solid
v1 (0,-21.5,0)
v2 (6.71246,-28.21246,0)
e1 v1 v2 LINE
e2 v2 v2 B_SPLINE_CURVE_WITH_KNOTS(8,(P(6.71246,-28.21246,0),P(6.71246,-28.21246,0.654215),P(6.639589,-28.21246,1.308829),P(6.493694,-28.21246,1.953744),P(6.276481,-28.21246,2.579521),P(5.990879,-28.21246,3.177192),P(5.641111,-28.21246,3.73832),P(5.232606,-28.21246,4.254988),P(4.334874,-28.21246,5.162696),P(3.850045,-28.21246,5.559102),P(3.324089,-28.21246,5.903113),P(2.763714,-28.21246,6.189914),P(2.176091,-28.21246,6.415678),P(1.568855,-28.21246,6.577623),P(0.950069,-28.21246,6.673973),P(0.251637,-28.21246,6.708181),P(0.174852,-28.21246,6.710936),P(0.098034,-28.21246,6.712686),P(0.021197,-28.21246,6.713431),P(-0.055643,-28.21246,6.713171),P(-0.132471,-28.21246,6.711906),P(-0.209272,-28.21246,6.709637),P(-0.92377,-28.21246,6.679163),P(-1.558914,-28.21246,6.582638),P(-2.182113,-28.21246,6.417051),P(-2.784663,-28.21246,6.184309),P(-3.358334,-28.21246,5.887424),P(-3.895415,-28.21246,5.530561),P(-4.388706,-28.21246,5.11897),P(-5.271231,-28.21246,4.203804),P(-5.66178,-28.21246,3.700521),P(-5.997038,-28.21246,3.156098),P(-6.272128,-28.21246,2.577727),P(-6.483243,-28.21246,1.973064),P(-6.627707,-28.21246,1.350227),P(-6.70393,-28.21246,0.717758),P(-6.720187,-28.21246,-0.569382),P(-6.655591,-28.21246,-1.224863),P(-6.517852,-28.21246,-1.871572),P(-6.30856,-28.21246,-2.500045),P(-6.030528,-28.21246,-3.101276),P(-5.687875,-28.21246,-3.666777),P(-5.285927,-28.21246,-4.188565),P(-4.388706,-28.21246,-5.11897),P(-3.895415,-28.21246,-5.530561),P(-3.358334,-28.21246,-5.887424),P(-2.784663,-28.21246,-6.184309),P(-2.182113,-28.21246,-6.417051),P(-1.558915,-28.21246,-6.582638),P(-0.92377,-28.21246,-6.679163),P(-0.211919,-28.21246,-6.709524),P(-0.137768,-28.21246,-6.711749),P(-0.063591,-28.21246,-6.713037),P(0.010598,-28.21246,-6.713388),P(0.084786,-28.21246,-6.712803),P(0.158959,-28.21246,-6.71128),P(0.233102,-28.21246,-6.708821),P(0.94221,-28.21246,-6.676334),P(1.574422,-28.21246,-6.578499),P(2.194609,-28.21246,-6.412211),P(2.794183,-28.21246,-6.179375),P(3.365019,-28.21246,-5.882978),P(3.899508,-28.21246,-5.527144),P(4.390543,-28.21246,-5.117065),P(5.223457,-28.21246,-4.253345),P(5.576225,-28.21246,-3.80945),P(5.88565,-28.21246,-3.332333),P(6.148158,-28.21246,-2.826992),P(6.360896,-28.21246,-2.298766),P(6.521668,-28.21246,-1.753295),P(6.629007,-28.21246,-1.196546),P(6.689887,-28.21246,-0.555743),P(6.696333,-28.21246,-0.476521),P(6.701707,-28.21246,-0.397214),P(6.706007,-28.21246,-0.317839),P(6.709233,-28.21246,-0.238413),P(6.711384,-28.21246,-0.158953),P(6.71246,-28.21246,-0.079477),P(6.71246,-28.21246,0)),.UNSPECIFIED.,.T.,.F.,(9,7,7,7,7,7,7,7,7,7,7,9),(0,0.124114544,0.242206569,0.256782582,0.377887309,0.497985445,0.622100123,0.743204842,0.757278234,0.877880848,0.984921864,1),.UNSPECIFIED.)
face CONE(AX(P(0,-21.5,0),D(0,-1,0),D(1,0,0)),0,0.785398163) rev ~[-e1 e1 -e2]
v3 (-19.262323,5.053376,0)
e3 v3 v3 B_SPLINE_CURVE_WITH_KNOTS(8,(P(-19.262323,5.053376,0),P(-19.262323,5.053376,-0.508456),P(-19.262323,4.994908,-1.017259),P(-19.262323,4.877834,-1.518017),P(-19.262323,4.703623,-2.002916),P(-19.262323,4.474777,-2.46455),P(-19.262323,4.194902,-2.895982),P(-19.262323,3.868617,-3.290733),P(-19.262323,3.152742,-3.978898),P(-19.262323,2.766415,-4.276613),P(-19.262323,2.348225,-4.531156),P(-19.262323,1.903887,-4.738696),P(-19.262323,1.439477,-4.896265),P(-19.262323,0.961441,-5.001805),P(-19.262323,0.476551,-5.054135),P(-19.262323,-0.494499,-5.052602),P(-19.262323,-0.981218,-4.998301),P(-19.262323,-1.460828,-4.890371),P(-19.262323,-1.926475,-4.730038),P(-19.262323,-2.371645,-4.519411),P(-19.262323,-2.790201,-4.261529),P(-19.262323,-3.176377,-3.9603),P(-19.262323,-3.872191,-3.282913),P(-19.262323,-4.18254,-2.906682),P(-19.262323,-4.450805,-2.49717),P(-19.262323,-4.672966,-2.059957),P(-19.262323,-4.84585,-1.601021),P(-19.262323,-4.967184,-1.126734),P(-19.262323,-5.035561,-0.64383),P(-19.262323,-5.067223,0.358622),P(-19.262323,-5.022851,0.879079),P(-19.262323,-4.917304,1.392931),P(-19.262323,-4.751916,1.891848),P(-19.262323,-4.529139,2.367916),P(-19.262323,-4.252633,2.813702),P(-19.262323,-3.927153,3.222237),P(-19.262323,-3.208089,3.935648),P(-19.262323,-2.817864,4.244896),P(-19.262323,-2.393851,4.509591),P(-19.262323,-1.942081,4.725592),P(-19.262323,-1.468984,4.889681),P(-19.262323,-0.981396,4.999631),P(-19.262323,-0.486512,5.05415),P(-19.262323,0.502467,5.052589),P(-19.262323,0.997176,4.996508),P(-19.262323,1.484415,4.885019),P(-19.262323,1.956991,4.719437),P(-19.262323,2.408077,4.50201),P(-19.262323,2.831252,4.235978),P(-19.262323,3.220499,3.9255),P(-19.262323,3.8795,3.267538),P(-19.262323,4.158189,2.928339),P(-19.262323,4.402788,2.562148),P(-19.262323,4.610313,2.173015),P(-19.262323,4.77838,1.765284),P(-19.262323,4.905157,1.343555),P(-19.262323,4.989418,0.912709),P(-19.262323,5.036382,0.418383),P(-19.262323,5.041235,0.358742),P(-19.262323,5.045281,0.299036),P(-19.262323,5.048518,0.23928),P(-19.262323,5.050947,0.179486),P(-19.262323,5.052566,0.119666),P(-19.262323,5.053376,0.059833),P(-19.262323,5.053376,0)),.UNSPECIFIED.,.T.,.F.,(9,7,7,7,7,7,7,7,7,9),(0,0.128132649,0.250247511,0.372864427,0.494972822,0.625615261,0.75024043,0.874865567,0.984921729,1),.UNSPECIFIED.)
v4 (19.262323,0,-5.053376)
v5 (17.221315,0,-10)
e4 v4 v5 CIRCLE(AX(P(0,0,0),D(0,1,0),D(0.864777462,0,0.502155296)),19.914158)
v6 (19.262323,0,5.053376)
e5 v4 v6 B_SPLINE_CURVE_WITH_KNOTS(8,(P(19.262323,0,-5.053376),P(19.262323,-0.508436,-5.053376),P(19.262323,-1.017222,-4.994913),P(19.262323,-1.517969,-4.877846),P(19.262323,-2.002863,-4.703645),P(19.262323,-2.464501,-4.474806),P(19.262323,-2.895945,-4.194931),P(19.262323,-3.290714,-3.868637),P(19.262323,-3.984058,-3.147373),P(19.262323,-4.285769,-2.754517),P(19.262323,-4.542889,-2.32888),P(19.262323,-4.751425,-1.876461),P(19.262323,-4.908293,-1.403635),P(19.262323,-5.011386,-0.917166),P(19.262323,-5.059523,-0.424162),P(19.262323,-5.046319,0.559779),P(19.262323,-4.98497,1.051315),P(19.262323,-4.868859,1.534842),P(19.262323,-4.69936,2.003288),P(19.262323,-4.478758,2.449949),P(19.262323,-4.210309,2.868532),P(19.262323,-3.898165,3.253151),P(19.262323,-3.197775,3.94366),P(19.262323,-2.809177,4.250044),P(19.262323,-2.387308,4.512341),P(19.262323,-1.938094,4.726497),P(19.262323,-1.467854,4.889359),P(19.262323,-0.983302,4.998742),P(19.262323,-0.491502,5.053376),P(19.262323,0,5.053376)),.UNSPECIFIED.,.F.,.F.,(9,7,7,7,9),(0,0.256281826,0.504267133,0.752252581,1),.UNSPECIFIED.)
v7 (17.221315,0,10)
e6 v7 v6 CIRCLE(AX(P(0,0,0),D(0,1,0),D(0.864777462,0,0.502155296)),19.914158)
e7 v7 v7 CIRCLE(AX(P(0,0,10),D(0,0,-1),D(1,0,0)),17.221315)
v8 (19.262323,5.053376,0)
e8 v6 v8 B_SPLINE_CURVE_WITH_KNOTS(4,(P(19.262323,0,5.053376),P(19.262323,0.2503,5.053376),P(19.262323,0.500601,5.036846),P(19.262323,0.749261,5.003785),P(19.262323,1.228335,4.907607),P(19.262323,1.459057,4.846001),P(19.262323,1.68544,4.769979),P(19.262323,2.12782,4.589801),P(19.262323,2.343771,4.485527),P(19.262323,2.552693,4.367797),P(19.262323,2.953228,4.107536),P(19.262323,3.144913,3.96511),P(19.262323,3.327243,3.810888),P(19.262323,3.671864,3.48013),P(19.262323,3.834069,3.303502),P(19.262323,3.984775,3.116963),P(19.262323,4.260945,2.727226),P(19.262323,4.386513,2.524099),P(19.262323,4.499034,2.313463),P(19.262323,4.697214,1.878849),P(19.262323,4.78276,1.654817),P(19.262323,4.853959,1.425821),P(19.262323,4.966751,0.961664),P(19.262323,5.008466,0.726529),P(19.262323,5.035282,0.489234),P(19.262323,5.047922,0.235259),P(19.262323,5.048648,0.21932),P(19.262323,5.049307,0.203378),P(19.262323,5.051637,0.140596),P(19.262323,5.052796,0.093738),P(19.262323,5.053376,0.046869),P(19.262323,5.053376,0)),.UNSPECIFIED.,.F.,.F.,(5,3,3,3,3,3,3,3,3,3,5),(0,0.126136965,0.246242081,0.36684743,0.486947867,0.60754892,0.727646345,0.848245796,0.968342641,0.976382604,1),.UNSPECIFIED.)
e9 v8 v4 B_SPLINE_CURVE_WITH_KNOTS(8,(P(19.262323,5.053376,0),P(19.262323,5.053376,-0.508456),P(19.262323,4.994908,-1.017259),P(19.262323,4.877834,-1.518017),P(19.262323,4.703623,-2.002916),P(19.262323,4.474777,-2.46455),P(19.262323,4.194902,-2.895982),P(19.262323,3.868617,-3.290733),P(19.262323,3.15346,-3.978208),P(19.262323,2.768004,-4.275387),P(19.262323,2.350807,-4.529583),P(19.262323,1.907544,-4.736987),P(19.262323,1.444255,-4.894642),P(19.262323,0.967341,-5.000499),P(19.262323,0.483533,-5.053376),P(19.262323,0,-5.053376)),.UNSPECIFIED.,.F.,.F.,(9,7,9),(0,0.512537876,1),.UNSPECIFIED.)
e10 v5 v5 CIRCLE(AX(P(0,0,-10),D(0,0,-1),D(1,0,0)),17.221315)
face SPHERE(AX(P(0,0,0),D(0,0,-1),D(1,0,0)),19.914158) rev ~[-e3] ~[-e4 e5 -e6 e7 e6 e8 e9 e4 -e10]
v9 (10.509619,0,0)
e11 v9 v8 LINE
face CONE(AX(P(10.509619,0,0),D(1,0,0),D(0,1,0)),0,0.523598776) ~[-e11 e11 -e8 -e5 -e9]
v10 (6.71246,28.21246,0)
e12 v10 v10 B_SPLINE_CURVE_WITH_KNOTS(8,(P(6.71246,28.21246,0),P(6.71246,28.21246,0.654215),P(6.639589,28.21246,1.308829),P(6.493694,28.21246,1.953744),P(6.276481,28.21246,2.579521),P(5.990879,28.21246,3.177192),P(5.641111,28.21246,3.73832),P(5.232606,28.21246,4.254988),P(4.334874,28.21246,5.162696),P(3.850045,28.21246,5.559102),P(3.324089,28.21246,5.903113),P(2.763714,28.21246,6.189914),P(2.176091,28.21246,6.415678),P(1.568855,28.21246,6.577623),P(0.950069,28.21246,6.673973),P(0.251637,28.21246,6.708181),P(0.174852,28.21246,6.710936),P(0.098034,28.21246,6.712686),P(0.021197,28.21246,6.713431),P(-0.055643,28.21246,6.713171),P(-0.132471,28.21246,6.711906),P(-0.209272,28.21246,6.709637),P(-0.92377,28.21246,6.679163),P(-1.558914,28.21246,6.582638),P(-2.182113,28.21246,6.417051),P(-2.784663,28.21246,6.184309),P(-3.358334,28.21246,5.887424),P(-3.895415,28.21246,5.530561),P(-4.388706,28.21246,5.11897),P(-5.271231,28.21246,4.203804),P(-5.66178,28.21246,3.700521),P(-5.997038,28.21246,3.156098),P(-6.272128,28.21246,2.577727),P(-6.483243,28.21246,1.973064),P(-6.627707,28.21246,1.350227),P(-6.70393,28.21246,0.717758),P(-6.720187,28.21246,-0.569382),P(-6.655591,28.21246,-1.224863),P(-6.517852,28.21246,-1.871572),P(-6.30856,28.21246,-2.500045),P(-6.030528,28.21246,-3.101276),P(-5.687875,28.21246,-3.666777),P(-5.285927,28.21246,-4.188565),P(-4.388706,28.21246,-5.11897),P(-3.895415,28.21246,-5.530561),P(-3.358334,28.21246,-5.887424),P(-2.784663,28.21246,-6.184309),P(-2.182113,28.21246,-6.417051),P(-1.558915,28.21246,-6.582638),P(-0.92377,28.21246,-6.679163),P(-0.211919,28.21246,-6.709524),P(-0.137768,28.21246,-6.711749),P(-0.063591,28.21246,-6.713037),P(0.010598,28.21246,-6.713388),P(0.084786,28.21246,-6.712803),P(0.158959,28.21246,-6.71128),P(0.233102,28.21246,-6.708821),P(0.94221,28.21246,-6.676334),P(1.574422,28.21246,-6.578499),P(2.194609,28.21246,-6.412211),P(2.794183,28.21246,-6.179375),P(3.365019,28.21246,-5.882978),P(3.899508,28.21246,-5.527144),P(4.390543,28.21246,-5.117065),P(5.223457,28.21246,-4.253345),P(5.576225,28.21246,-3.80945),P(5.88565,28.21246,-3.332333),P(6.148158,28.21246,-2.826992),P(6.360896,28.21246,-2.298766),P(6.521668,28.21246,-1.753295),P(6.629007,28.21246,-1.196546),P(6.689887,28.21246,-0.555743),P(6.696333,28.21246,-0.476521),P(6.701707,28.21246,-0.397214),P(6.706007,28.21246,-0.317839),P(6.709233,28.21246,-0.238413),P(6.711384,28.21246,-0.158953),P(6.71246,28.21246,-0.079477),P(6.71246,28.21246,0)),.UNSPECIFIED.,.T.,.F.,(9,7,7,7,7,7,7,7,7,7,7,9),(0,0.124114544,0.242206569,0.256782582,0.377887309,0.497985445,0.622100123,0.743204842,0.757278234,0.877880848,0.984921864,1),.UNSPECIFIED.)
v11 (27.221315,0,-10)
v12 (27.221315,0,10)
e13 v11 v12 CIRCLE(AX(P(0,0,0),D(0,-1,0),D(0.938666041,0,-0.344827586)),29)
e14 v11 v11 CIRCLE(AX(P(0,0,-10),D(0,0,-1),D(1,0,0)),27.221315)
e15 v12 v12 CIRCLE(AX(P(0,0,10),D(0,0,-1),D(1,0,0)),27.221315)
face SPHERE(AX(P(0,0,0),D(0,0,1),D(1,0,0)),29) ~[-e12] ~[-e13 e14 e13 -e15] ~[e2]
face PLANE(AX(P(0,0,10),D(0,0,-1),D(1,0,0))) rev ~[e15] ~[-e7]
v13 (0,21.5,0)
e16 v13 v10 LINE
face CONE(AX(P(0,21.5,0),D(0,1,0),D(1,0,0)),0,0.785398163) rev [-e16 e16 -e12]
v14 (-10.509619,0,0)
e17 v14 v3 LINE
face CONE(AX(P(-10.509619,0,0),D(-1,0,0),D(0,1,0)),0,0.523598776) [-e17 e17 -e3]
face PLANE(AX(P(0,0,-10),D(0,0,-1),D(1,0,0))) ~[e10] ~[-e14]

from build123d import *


# Not quite as in the source:
# - a pattern or mirror of a feature is missing from the dataset's text; its kind, count and spacing are read off the source's solid


with BuildPart() as f1:
    # F0 (on Front) → F1 (revolve)
    with BuildSketch(Plane.XZ):
        with BuildLine():
            Line((27.2213151776, 10), (17.2213151776, 10))
            ThreePointArc((17.2213151776, 10), (19.9141581908, 0), (17.2213151776, -10))
            Line((17.2213151776, -10), (27.2213151776, -10))
            Line((27.2213151776, -10), (27.2213151776, 10))
        make_face()
        with BuildLine():
            ThreePointArc((27.2213151776, -10), (29, 0), (27.2213151776, 10))
            Line((27.2213151776, 10), (27.2213151776, -10))
        make_face()
    revolve(axis=Axis((0, 0, -0.0082536135), (0, 0, -1)))

    # F2 (on Top) → F3 (revolve, cut)
    with BuildSketch(Plane.XY):
        Polygon((0, 30.5), (0, 21.5), (9, 30.5), align=None)
    f3 = revolve(axis=Axis((0, 26, 0), (0, -1, 0)), mode=Mode.SUBTRACT)

    # F3_copies: F3 across plane
    add(f3.mirror(Plane(origin=(0, 0, 0), x_dir=(0, 0, -1), z_dir=(0, -1, 0))), mode=Mode.SUBTRACT)

    # F4 (on Top) → F5 (revolve)
    with BuildSketch(Plane.XY):
        Polygon((-10.5096189432, 0), (-23.5, 7.5), (-23.5, 0), align=None)
    f5 = revolve(axis=Axis((-17.0048094716, 0, 0), (-1, 0, 0)))

    # F5_copies: F5 across plane
    add(f5.mirror(Plane(origin=(0, 0, 0), x_dir=(0, 0, 1), z_dir=(1, 0, 0))))


solid = f1.part
